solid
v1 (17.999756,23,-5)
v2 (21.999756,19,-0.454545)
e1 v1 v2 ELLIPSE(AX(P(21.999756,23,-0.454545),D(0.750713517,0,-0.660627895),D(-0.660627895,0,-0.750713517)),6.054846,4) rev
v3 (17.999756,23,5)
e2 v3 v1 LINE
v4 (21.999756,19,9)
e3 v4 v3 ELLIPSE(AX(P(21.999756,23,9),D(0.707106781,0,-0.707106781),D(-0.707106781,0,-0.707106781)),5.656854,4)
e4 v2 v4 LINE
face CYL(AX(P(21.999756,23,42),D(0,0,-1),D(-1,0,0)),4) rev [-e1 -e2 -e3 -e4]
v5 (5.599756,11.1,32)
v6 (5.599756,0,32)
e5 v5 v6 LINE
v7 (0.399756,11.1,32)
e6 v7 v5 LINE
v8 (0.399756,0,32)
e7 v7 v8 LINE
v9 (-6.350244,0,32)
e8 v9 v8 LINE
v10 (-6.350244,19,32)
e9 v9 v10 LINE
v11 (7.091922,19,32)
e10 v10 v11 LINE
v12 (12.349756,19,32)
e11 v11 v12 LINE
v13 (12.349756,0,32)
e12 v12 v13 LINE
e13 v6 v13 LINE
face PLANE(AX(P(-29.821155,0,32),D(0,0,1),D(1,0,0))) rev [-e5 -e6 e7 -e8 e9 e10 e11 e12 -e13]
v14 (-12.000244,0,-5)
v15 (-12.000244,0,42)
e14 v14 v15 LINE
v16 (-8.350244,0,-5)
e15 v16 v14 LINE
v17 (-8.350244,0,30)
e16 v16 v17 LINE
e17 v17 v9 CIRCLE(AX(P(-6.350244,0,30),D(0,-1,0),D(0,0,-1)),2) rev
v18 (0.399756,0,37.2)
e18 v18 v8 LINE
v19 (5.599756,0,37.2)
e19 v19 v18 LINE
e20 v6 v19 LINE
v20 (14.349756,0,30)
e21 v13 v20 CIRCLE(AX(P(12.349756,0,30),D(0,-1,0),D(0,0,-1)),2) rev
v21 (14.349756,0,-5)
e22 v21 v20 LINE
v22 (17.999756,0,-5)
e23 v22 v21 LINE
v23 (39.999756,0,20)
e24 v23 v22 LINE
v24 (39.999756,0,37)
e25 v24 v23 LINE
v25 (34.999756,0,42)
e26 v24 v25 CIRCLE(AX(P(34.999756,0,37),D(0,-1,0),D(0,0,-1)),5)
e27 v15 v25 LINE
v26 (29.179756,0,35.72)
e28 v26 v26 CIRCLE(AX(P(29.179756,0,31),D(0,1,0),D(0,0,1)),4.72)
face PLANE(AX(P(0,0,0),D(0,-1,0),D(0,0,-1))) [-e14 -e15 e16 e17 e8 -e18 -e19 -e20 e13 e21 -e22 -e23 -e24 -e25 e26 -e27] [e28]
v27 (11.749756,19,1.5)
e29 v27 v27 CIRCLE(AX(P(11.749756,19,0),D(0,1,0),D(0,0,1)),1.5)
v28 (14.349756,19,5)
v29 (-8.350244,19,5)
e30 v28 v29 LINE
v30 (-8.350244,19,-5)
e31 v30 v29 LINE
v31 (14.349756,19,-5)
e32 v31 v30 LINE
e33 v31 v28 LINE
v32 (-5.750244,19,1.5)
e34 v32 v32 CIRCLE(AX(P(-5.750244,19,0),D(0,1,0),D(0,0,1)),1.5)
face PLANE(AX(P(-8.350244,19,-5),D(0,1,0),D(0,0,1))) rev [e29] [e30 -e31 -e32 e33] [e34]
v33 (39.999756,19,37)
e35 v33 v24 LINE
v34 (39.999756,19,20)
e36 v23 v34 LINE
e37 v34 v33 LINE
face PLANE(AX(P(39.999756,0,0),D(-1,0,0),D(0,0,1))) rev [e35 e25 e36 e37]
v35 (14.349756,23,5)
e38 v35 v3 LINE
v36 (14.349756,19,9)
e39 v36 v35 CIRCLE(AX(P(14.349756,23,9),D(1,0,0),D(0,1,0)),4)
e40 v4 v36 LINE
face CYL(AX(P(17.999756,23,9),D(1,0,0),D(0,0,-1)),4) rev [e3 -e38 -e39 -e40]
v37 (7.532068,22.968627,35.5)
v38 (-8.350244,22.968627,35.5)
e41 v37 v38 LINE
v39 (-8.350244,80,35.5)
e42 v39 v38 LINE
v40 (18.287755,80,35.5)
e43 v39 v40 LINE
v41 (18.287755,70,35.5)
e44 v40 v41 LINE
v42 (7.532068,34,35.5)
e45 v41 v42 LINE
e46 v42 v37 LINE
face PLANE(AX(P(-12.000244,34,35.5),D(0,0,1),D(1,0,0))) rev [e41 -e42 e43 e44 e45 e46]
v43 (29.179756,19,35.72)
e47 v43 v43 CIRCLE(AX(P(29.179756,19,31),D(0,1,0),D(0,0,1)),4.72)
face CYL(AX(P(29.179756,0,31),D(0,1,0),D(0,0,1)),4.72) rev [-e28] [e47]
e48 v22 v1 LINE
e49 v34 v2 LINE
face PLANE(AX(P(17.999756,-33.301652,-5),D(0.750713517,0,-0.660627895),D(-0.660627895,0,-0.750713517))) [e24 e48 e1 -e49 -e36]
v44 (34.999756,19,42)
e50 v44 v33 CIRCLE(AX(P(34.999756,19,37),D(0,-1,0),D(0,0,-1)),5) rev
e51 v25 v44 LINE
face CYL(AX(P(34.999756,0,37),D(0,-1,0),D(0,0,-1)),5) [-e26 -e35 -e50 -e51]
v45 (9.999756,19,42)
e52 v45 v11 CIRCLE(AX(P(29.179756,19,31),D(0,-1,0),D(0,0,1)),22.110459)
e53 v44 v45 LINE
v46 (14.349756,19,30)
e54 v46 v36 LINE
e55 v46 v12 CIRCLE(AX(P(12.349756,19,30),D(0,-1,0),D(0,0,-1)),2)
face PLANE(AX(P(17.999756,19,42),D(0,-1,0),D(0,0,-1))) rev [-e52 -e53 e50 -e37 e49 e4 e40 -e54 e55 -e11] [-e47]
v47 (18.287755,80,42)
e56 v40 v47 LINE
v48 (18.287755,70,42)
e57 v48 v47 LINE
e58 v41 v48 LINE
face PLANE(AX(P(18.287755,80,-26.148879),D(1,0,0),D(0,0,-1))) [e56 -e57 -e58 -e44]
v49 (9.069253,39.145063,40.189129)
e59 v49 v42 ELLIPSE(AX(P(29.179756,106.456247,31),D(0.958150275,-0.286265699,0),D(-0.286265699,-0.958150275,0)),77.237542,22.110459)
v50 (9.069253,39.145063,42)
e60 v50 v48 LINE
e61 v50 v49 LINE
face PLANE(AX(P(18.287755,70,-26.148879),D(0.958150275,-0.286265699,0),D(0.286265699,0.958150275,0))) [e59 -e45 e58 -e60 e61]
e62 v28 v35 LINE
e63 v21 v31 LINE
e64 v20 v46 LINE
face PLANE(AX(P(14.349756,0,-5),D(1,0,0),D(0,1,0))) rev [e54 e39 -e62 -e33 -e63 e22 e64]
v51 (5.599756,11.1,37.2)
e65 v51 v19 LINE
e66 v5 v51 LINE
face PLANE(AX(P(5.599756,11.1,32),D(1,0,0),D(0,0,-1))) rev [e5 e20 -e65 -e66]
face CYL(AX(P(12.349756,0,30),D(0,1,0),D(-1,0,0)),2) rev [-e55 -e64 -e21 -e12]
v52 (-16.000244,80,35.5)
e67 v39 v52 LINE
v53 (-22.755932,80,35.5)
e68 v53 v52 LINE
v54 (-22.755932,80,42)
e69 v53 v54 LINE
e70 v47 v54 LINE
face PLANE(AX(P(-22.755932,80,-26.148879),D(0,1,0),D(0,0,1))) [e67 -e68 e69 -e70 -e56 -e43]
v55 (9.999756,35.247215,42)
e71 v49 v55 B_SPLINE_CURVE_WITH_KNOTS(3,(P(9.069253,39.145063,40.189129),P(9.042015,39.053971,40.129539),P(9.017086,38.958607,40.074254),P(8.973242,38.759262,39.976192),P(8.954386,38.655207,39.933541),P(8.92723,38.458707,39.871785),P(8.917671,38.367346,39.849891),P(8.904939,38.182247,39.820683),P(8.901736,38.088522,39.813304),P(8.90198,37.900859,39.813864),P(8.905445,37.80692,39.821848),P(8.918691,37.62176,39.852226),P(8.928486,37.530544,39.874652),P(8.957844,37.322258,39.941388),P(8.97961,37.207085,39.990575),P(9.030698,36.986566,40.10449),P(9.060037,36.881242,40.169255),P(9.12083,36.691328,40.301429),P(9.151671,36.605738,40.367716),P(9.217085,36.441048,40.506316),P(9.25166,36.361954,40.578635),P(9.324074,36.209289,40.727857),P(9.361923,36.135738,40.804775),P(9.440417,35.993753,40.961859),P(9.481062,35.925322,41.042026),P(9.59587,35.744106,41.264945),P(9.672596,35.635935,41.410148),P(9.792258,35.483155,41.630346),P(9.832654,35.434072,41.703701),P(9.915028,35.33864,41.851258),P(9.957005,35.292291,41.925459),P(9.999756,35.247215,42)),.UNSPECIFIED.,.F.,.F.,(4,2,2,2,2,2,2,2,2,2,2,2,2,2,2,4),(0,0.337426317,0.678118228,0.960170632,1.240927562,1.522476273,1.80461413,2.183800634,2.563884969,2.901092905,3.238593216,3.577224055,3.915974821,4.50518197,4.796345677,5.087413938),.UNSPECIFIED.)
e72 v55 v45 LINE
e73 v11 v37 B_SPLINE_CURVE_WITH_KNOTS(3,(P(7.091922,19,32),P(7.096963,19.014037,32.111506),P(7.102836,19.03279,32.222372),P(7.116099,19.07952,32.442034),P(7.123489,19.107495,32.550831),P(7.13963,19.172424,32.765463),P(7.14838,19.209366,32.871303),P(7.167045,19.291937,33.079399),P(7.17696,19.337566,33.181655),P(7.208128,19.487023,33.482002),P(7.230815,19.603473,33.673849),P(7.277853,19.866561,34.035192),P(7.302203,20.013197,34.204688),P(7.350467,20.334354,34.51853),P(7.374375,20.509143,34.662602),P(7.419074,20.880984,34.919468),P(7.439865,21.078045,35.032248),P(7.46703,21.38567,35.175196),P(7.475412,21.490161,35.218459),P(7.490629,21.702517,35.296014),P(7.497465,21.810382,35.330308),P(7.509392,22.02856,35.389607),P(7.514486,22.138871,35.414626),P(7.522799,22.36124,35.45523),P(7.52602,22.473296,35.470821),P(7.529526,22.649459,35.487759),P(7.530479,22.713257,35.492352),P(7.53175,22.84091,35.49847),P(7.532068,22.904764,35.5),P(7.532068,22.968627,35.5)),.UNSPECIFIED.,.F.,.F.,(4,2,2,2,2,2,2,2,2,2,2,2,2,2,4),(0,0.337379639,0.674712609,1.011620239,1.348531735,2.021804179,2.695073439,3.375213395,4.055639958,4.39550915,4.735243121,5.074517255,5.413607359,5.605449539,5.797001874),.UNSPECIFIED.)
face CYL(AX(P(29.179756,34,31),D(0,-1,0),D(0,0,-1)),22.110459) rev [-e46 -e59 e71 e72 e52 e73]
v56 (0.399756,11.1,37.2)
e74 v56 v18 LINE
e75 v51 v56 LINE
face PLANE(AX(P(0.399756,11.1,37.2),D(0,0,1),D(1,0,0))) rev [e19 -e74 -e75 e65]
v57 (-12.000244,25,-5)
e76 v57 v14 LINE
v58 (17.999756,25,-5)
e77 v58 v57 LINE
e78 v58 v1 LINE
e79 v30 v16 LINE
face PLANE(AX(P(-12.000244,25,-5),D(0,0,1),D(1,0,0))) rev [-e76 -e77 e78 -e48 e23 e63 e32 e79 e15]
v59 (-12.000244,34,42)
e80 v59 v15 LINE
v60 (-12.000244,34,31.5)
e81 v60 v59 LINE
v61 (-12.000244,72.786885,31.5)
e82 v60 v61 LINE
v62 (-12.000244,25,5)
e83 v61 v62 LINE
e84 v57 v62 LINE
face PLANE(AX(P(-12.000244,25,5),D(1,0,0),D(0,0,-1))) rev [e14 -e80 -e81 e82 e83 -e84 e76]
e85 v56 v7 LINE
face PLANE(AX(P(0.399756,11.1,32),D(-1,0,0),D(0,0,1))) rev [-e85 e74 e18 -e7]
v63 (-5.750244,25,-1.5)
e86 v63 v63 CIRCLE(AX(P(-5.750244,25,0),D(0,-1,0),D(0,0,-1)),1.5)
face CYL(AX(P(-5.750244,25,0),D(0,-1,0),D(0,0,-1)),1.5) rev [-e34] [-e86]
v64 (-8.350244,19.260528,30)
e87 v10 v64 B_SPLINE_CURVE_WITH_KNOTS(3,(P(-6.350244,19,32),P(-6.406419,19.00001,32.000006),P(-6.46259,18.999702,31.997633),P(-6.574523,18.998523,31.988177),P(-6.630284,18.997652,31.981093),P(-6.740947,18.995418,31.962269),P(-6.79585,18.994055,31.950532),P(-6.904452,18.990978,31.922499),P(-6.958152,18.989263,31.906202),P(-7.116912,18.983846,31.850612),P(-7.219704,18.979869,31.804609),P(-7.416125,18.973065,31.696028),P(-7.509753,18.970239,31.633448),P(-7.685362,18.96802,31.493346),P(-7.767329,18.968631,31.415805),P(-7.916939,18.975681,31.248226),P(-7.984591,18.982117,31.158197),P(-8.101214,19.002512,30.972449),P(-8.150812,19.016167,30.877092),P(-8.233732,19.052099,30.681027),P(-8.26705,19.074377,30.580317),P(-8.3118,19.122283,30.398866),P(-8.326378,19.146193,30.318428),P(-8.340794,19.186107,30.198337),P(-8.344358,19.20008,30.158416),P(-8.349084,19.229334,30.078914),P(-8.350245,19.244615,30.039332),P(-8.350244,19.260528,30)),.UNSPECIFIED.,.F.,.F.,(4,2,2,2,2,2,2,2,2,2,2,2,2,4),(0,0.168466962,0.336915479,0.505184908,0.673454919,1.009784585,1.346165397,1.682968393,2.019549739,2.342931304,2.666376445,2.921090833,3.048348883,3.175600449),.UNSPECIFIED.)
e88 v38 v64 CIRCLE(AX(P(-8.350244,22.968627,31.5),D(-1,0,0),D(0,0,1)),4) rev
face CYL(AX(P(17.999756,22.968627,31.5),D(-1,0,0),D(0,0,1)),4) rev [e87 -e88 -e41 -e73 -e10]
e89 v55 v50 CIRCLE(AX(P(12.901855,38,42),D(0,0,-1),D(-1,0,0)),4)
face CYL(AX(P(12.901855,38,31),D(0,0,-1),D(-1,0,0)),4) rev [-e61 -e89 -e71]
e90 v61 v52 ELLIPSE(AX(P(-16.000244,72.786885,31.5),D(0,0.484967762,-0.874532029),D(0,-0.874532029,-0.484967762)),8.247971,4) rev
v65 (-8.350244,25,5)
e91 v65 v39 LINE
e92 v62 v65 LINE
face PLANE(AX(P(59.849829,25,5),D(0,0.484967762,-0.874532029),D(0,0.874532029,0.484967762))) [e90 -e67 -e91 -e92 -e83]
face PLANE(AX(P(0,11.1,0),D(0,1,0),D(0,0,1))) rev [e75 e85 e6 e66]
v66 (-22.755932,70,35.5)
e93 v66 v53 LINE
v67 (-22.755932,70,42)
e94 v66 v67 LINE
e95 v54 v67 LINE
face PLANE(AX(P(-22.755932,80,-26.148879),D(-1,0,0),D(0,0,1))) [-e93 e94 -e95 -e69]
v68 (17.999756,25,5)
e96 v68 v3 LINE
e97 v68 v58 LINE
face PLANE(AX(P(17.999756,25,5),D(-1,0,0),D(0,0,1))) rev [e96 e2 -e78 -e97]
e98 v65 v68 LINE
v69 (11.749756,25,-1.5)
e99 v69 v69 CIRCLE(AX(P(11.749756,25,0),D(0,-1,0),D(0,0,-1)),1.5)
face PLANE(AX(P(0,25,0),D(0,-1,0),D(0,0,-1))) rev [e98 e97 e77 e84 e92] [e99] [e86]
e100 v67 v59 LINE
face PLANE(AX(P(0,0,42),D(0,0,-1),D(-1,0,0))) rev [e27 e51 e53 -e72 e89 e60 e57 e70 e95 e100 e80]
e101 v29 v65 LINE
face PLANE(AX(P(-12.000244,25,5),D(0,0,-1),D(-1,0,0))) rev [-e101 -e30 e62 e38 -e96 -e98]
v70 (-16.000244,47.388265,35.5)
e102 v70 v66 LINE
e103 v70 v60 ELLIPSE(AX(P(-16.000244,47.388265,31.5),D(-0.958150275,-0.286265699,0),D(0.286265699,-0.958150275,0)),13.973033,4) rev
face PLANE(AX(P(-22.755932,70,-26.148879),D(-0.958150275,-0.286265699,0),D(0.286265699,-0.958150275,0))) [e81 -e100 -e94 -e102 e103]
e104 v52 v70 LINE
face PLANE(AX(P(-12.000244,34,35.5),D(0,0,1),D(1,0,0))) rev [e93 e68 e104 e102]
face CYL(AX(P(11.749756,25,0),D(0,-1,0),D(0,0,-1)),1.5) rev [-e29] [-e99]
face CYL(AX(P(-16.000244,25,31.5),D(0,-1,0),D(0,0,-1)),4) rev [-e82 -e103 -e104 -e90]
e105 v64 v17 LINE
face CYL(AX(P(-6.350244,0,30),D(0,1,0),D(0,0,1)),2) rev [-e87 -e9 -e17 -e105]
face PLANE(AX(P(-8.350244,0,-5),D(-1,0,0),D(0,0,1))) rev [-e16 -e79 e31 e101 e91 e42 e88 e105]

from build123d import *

# Parameters (mm, degrees)
SKETCH2_W            = 30
SKETCH2_H            = 10
BOSS_EXTRUDE1_DEPTH  = 25
SKETCH3_W            = 22.7
SKETCH3_H            = 19
CUT_EXTRUDE1_DEPTH   = 33.388133727
SKETCH4_R            = 1.5
CUT_EXTRUDE2_DEPTH   = 32.208832184
SKETCH5_W            = 3.65
SKETCH5_H            = 19
BOSS_EXTRUDE2_DEPTH  = 37
SKETCH6_W            = 3.65
SKETCH6_H            = 19
BOSS_EXTRUDE3_DEPTH  = 37
SKETCH11_W           = 10
SKETCH11_H           = 19
BOSS_EXTRUDE7_DEPTH  = 22.7
SKETCH12_W           = 5.2
SKETCH12_H           = 5.2
CUT_EXTRUDE4_DEPTH   = 11.1
SKETCH14_W           = 22
SKETCH14_H           = 19
BOSS_EXTRUDE8_DEPTH  = 22
SKETCH15_R           = 4.72
CUT_EXTRUDE6_DEPTH   = 62.032617987
BOSS_EXTRUDE9_DEPTH  = 15
BOSS_EXTRUDE11_DEPTH = 19
BOSS_EXTRUDE12_DEPTH = 6.5
BOSS_EXTRUDE13_DEPTH = 3.65
FILLET1_R            = 5
FILLET2_R            = 4
FILLET3_R            = 2
FILLET5_R            = 4


with BuildPart() as part:
    # Sketch2 → Boss-Extrude1 (new body)
    with BuildSketch(Plane(origin=(0, 0, 0), x_dir=(1, 0, 0), z_dir=(0, 1, 0))):
        with Locations((2.999755729, 0)):
            Rectangle(SKETCH2_W, SKETCH2_H)
    extrude(amount=BOSS_EXTRUDE1_DEPTH)

    # Sketch3 → Cut-Extrude1 (cut, through all)
    with BuildSketch(Plane.XY.offset(5)):
        with Locations((2.999755729, 9.5)):
            Rectangle(SKETCH3_W, SKETCH3_H)
    extrude(amount=-CUT_EXTRUDE1_DEPTH, mode=Mode.SUBTRACT)

    # Sketch4 → Cut-Extrude2 (cut, through all)
    with BuildSketch(Plane.XZ):
        with Locations(Location((-5.750244271, 0, 0), (0, 0, 270))):
            Circle(SKETCH4_R)
        with Locations(Location((11.749755729, 0, 0), (0, 0, 270))):
            Circle(SKETCH4_R)
    extrude(amount=-CUT_EXTRUDE2_DEPTH, mode=Mode.SUBTRACT)

    # Sketch5 → Boss-Extrude2 (add)
    with BuildSketch(Plane.XY.offset(5)):
        with Locations((16.174755729, 9.5)):
            Rectangle(SKETCH5_W, SKETCH5_H)
    extrude(amount=BOSS_EXTRUDE2_DEPTH)

    # Sketch6 → Boss-Extrude3 (add)
    with BuildSketch(Plane.XY.offset(5)):
        with Locations((-10.175244271, 9.5)):
            Rectangle(SKETCH6_W, SKETCH6_H)
    extrude(amount=BOSS_EXTRUDE3_DEPTH)

    # Sketch11 → Boss-Extrude7 (add)
    with BuildSketch(Plane.ZY.offset(-14.349755729)):
        with Locations((37, 9.5)):
            Rectangle(SKETCH11_W, SKETCH11_H)
    extrude(amount=BOSS_EXTRUDE7_DEPTH)

    # Sketch12 → Cut-Extrude4 (cut)
    with BuildSketch(Plane.XZ):
        with Locations((2.999755729, 34.6)):
            Rectangle(SKETCH12_W, SKETCH12_H)
    extrude(amount=-CUT_EXTRUDE4_DEPTH, mode=Mode.SUBTRACT)

    # Sketch14 → Boss-Extrude8 (add)
    with BuildSketch(Plane(origin=(17.999755729, 0, 0), x_dir=(0, 0, -1), z_dir=(1, 0, 0))):
        with Locations((-31, 9.5)):
            Rectangle(SKETCH14_W, SKETCH14_H)
    extrude(amount=BOSS_EXTRUDE8_DEPTH)

    # Sketch15 → Cut-Extrude6 (cut, through all)
    with BuildSketch(Plane(origin=(0, 19, 0), x_dir=(1, 0, 0), z_dir=(0, 1, 0))):
        with Locations(Location((29.179755729, -31, 0), (0, 0, 270))):
            Circle(SKETCH15_R)
    extrude(amount=-CUT_EXTRUDE6_DEPTH, mode=Mode.SUBTRACT)

    # Sketch16 → Boss-Extrude9 (add)
    with BuildSketch(Plane(origin=(0, 19, 0), x_dir=(1, 0, 0), z_dir=(0, 1, 0))):
        with BuildLine():
            Line((-12.000244271, -42), (9.999755729, -42))
            ThreePointArc((9.999755729, -42), (8.508821331, -38.847602891), (7.532067631, -35.5))
            Line((7.532067631, -35.5), (-12.000244271, -35.5))
            Line((-12.000244271, -35.5), (-12.000244271, -42))
        make_face()
    extrude(amount=BOSS_EXTRUDE9_DEPTH)

    # Sketch18 → Boss-Extrude11 (add)
    with BuildSketch(Plane(origin=(0, 19, 0), x_dir=(1, 0, 0), z_dir=(0, 1, 0))):
        Polygon((17.999755729, -20), (17.999755729, 5), (39.999755729, -20), align=None)
    extrude(amount=-BOSS_EXTRUDE11_DEPTH)

    # Sketch19 → Boss-Extrude12 (add)
    with BuildSketch(Plane.XY.offset(42)):
        Polygon((-22.755932023, 80), (18.287755383, 80), (18.287755383, 70), (7.532067631, 34), (-12.000244271, 34), (-22.755932023, 70), align=None)
    extrude(amount=-BOSS_EXTRUDE12_DEPTH)

    # Sketch20 → Boss-Extrude13 (add)
    with BuildSketch(Plane.ZY.offset(12.000244271)):
        Polygon((5, 25), (35.5, 80), (35.5, 19), (5, 19), align=None)
    extrude(amount=-BOSS_EXTRUDE13_DEPTH)

    # Fillet1
    fillet1_edges = [part.edges().sort_by_distance(p)[0] for p in [
        (39.999755729, 9.5, 42),
    ]]
    fillet(fillet1_edges, radius=FILLET1_R)

    # Fillet2
    # the kernel refuses this fillet: 4 mm, written as the material it adds along each edge
    with BuildSketch(Plane(origin=(17.999755729, 19, 5), x_dir=(1, 0, 0), z_dir=(0, 0, -1))) as fillet2_piece_1_section:
        with BuildLine():
            CenterArc((FILLET2_R, -FILLET2_R), FILLET2_R, 90, 90)
            Line((0, -FILLET2_R), (0, 0))
            Line((0, 0), (FILLET2_R, 0))
        make_face()
    fillet2_piece_1 = extrude(amount=20, mode=Mode.PRIVATE)
    fillet2_piece_1 = split(fillet2_piece_1, bisect_by=Plane(origin=(22.959178632, 19, 0.635707845), z_dir=(-0.7507135169227555, 0, 0.6606278948920247)), keep=Keep.TOP, mode=Mode.PRIVATE)
    add(fillet2_piece_1)
    with BuildSketch(Plane(origin=(-12.000244271, 90, 35.5), x_dir=(0, 0, -1), z_dir=(0, -1, 0))) as fillet2_piece_2_section:
        with BuildLine():
            CenterArc((FILLET2_R, -FILLET2_R), FILLET2_R, 90, 90)
            Line((0, -FILLET2_R), (0, 0))
            Line((0, 0), (FILLET2_R, 0))
        make_face()
    fillet2_piece_2 = extrude(amount=66, mode=Mode.PRIVATE)
    fillet2_piece_2 = split(fillet2_piece_2, bisect_by=Plane(origin=(-27.36023555, 85.410909165, 35.5), z_dir=(0.9581502749407442, 0.2862656993615832, 0)), keep=Keep.TOP, mode=Mode.PRIVATE)
    fillet2_piece_2 = split(fillet2_piece_2, bisect_by=Plane(origin=(-12.000244271, 87.648062701, 39.741198407), z_dir=(0, -0.48496776166331645, 0.8745320292289315)), keep=Keep.TOP, mode=Mode.PRIVATE)
    add(fillet2_piece_2)
    with BuildSketch(Plane(origin=(17.999755729, 19, 5), x_dir=(0, 0, 1), z_dir=(-1, 0, 0))) as fillet2_piece_3:
        with BuildLine():
            CenterArc((FILLET2_R, FILLET2_R), FILLET2_R, 180, 90)
            Line((0, FILLET2_R), (0, 0))
            Line((0, 0), (FILLET2_R, 0))
        make_face()
    extrude(amount=3.65)
    with BuildSketch(Plane(origin=(17.453635047, 19, 35.5), x_dir=(0, 0, -1), z_dir=(-1, 0, 0))) as fillet2_piece_4_section:
        with BuildLine():
            CenterArc((4, -3.968626967), FILLET2_R, 97.180755781, 82.819244219)
            Line((0, -3.968626967), (0, 0))
            Line((0, 0), (3.5, 0))
        make_face()
    fillet2_piece_4 = extrude(amount=35.725446735, mode=Mode.PRIVATE)
    fillet2_piece_4 = fillet2_piece_4 - Plane(origin=(29.179755729, 19, 31), x_dir=(-0.8674627670502353, 0, 0.49750210831869773), z_dir=(0, -1, 0)) * Cylinder(22.110459064, 88, mode=Mode.PRIVATE)
    fillet2_piece_4 = split(fillet2_piece_4, bisect_by=Plane(origin=(-12.000244271, 19, 35.5), z_dir=(1, 0, 0)), keep=Keep.TOP, mode=Mode.PRIVATE)
    add(fillet2_piece_4)
    with BuildSketch(Plane(origin=(17.999755729, 19, 15), x_dir=(1, 0, 0), z_dir=(0, 0, -1))) as fillet2_piece_5a_section:
        with BuildLine():
            CenterArc((FILLET2_R, -FILLET2_R), FILLET2_R, 90, 90)
            Line((0, -FILLET2_R), (0, 0))
            Line((0, 0), (FILLET2_R, 0))
        make_face()
    fillet2_piece_5a = extrude(amount=20, mode=Mode.PRIVATE)
    fillet2_piece_5a = split(fillet2_piece_5a, bisect_by=Plane(origin=(17.999755729, 19, 5), z_dir=(0, 0, 1)), keep=Keep.TOP, mode=Mode.PRIVATE)
    with BuildSketch(Plane(origin=(27.999755729, 19, 5), x_dir=(0, 0, 1), z_dir=(-1, 0, 0))) as fillet2_piece_5b_section:
        with BuildLine():
            CenterArc((FILLET2_R, FILLET2_R), FILLET2_R, 180, 90)
            Line((0, FILLET2_R), (0, 0))
            Line((0, 0), (FILLET2_R, 0))
        make_face()
    fillet2_piece_5b = extrude(amount=13.65, mode=Mode.PRIVATE)
    fillet2_piece_5b = split(fillet2_piece_5b, bisect_by=Plane(origin=(27.323470787, 19, 5.595130748), z_dir=(-0.7507135169227555, 0, 0.6606278948920247)), keep=Keep.TOP, mode=Mode.PRIVATE)
    fillet2_piece_5b = split(fillet2_piece_5b, bisect_by=Plane(origin=(17.999755729, 19, 5), z_dir=(1, 0, 0)), keep=Keep.TOP, mode=Mode.PRIVATE)
    fillet2_piece_5 = fillet2_piece_5a & fillet2_piece_5b
    add(fillet2_piece_5)

    # Fillet3
    fillet3_edges = [part.edges().sort_by_distance(p)[0] for p in [
        (14.349755729, 9.5, 32),
        (-8.350244271, 9.5, 32),
    ]]
    fillet(fillet3_edges, radius=FILLET3_R)

    # Fillet5
    # the kernel refuses this fillet: 4 mm, written as the material it adds along each edge
    with BuildSketch(Plane(origin=(7.532067631, 34, 42), x_dir=(0.2862656993615828, 0.9581502749407443, 0), z_dir=(0, 0, -1))) as fillet5_piece_1_section:
        with BuildLine():
            CenterArc((FILLET5_R * 1.34244672574, FILLET5_R), FILLET5_R, 163.365479622, 106.634520378)
            Line((FILLET5_R * 0.3842964508, FILLET5_R * 1.28626569936), (0, 0))
            Line((0, 0), (FILLET5_R * 1.34244672574, 0))
        make_face()
    fillet5_piece_1 = extrude(amount=6.5, mode=Mode.PRIVATE)
    fillet5_piece_1 = fillet5_piece_1 - Plane(origin=(29.179755729, 34, 31), x_dir=(-0.8674627670500467, 0, 0.49750210831902675), z_dir=(0, -1, 0)) * Cylinder(22.110459064, 35, mode=Mode.PRIVATE)
    add(fillet5_piece_1)


solid = part.part
